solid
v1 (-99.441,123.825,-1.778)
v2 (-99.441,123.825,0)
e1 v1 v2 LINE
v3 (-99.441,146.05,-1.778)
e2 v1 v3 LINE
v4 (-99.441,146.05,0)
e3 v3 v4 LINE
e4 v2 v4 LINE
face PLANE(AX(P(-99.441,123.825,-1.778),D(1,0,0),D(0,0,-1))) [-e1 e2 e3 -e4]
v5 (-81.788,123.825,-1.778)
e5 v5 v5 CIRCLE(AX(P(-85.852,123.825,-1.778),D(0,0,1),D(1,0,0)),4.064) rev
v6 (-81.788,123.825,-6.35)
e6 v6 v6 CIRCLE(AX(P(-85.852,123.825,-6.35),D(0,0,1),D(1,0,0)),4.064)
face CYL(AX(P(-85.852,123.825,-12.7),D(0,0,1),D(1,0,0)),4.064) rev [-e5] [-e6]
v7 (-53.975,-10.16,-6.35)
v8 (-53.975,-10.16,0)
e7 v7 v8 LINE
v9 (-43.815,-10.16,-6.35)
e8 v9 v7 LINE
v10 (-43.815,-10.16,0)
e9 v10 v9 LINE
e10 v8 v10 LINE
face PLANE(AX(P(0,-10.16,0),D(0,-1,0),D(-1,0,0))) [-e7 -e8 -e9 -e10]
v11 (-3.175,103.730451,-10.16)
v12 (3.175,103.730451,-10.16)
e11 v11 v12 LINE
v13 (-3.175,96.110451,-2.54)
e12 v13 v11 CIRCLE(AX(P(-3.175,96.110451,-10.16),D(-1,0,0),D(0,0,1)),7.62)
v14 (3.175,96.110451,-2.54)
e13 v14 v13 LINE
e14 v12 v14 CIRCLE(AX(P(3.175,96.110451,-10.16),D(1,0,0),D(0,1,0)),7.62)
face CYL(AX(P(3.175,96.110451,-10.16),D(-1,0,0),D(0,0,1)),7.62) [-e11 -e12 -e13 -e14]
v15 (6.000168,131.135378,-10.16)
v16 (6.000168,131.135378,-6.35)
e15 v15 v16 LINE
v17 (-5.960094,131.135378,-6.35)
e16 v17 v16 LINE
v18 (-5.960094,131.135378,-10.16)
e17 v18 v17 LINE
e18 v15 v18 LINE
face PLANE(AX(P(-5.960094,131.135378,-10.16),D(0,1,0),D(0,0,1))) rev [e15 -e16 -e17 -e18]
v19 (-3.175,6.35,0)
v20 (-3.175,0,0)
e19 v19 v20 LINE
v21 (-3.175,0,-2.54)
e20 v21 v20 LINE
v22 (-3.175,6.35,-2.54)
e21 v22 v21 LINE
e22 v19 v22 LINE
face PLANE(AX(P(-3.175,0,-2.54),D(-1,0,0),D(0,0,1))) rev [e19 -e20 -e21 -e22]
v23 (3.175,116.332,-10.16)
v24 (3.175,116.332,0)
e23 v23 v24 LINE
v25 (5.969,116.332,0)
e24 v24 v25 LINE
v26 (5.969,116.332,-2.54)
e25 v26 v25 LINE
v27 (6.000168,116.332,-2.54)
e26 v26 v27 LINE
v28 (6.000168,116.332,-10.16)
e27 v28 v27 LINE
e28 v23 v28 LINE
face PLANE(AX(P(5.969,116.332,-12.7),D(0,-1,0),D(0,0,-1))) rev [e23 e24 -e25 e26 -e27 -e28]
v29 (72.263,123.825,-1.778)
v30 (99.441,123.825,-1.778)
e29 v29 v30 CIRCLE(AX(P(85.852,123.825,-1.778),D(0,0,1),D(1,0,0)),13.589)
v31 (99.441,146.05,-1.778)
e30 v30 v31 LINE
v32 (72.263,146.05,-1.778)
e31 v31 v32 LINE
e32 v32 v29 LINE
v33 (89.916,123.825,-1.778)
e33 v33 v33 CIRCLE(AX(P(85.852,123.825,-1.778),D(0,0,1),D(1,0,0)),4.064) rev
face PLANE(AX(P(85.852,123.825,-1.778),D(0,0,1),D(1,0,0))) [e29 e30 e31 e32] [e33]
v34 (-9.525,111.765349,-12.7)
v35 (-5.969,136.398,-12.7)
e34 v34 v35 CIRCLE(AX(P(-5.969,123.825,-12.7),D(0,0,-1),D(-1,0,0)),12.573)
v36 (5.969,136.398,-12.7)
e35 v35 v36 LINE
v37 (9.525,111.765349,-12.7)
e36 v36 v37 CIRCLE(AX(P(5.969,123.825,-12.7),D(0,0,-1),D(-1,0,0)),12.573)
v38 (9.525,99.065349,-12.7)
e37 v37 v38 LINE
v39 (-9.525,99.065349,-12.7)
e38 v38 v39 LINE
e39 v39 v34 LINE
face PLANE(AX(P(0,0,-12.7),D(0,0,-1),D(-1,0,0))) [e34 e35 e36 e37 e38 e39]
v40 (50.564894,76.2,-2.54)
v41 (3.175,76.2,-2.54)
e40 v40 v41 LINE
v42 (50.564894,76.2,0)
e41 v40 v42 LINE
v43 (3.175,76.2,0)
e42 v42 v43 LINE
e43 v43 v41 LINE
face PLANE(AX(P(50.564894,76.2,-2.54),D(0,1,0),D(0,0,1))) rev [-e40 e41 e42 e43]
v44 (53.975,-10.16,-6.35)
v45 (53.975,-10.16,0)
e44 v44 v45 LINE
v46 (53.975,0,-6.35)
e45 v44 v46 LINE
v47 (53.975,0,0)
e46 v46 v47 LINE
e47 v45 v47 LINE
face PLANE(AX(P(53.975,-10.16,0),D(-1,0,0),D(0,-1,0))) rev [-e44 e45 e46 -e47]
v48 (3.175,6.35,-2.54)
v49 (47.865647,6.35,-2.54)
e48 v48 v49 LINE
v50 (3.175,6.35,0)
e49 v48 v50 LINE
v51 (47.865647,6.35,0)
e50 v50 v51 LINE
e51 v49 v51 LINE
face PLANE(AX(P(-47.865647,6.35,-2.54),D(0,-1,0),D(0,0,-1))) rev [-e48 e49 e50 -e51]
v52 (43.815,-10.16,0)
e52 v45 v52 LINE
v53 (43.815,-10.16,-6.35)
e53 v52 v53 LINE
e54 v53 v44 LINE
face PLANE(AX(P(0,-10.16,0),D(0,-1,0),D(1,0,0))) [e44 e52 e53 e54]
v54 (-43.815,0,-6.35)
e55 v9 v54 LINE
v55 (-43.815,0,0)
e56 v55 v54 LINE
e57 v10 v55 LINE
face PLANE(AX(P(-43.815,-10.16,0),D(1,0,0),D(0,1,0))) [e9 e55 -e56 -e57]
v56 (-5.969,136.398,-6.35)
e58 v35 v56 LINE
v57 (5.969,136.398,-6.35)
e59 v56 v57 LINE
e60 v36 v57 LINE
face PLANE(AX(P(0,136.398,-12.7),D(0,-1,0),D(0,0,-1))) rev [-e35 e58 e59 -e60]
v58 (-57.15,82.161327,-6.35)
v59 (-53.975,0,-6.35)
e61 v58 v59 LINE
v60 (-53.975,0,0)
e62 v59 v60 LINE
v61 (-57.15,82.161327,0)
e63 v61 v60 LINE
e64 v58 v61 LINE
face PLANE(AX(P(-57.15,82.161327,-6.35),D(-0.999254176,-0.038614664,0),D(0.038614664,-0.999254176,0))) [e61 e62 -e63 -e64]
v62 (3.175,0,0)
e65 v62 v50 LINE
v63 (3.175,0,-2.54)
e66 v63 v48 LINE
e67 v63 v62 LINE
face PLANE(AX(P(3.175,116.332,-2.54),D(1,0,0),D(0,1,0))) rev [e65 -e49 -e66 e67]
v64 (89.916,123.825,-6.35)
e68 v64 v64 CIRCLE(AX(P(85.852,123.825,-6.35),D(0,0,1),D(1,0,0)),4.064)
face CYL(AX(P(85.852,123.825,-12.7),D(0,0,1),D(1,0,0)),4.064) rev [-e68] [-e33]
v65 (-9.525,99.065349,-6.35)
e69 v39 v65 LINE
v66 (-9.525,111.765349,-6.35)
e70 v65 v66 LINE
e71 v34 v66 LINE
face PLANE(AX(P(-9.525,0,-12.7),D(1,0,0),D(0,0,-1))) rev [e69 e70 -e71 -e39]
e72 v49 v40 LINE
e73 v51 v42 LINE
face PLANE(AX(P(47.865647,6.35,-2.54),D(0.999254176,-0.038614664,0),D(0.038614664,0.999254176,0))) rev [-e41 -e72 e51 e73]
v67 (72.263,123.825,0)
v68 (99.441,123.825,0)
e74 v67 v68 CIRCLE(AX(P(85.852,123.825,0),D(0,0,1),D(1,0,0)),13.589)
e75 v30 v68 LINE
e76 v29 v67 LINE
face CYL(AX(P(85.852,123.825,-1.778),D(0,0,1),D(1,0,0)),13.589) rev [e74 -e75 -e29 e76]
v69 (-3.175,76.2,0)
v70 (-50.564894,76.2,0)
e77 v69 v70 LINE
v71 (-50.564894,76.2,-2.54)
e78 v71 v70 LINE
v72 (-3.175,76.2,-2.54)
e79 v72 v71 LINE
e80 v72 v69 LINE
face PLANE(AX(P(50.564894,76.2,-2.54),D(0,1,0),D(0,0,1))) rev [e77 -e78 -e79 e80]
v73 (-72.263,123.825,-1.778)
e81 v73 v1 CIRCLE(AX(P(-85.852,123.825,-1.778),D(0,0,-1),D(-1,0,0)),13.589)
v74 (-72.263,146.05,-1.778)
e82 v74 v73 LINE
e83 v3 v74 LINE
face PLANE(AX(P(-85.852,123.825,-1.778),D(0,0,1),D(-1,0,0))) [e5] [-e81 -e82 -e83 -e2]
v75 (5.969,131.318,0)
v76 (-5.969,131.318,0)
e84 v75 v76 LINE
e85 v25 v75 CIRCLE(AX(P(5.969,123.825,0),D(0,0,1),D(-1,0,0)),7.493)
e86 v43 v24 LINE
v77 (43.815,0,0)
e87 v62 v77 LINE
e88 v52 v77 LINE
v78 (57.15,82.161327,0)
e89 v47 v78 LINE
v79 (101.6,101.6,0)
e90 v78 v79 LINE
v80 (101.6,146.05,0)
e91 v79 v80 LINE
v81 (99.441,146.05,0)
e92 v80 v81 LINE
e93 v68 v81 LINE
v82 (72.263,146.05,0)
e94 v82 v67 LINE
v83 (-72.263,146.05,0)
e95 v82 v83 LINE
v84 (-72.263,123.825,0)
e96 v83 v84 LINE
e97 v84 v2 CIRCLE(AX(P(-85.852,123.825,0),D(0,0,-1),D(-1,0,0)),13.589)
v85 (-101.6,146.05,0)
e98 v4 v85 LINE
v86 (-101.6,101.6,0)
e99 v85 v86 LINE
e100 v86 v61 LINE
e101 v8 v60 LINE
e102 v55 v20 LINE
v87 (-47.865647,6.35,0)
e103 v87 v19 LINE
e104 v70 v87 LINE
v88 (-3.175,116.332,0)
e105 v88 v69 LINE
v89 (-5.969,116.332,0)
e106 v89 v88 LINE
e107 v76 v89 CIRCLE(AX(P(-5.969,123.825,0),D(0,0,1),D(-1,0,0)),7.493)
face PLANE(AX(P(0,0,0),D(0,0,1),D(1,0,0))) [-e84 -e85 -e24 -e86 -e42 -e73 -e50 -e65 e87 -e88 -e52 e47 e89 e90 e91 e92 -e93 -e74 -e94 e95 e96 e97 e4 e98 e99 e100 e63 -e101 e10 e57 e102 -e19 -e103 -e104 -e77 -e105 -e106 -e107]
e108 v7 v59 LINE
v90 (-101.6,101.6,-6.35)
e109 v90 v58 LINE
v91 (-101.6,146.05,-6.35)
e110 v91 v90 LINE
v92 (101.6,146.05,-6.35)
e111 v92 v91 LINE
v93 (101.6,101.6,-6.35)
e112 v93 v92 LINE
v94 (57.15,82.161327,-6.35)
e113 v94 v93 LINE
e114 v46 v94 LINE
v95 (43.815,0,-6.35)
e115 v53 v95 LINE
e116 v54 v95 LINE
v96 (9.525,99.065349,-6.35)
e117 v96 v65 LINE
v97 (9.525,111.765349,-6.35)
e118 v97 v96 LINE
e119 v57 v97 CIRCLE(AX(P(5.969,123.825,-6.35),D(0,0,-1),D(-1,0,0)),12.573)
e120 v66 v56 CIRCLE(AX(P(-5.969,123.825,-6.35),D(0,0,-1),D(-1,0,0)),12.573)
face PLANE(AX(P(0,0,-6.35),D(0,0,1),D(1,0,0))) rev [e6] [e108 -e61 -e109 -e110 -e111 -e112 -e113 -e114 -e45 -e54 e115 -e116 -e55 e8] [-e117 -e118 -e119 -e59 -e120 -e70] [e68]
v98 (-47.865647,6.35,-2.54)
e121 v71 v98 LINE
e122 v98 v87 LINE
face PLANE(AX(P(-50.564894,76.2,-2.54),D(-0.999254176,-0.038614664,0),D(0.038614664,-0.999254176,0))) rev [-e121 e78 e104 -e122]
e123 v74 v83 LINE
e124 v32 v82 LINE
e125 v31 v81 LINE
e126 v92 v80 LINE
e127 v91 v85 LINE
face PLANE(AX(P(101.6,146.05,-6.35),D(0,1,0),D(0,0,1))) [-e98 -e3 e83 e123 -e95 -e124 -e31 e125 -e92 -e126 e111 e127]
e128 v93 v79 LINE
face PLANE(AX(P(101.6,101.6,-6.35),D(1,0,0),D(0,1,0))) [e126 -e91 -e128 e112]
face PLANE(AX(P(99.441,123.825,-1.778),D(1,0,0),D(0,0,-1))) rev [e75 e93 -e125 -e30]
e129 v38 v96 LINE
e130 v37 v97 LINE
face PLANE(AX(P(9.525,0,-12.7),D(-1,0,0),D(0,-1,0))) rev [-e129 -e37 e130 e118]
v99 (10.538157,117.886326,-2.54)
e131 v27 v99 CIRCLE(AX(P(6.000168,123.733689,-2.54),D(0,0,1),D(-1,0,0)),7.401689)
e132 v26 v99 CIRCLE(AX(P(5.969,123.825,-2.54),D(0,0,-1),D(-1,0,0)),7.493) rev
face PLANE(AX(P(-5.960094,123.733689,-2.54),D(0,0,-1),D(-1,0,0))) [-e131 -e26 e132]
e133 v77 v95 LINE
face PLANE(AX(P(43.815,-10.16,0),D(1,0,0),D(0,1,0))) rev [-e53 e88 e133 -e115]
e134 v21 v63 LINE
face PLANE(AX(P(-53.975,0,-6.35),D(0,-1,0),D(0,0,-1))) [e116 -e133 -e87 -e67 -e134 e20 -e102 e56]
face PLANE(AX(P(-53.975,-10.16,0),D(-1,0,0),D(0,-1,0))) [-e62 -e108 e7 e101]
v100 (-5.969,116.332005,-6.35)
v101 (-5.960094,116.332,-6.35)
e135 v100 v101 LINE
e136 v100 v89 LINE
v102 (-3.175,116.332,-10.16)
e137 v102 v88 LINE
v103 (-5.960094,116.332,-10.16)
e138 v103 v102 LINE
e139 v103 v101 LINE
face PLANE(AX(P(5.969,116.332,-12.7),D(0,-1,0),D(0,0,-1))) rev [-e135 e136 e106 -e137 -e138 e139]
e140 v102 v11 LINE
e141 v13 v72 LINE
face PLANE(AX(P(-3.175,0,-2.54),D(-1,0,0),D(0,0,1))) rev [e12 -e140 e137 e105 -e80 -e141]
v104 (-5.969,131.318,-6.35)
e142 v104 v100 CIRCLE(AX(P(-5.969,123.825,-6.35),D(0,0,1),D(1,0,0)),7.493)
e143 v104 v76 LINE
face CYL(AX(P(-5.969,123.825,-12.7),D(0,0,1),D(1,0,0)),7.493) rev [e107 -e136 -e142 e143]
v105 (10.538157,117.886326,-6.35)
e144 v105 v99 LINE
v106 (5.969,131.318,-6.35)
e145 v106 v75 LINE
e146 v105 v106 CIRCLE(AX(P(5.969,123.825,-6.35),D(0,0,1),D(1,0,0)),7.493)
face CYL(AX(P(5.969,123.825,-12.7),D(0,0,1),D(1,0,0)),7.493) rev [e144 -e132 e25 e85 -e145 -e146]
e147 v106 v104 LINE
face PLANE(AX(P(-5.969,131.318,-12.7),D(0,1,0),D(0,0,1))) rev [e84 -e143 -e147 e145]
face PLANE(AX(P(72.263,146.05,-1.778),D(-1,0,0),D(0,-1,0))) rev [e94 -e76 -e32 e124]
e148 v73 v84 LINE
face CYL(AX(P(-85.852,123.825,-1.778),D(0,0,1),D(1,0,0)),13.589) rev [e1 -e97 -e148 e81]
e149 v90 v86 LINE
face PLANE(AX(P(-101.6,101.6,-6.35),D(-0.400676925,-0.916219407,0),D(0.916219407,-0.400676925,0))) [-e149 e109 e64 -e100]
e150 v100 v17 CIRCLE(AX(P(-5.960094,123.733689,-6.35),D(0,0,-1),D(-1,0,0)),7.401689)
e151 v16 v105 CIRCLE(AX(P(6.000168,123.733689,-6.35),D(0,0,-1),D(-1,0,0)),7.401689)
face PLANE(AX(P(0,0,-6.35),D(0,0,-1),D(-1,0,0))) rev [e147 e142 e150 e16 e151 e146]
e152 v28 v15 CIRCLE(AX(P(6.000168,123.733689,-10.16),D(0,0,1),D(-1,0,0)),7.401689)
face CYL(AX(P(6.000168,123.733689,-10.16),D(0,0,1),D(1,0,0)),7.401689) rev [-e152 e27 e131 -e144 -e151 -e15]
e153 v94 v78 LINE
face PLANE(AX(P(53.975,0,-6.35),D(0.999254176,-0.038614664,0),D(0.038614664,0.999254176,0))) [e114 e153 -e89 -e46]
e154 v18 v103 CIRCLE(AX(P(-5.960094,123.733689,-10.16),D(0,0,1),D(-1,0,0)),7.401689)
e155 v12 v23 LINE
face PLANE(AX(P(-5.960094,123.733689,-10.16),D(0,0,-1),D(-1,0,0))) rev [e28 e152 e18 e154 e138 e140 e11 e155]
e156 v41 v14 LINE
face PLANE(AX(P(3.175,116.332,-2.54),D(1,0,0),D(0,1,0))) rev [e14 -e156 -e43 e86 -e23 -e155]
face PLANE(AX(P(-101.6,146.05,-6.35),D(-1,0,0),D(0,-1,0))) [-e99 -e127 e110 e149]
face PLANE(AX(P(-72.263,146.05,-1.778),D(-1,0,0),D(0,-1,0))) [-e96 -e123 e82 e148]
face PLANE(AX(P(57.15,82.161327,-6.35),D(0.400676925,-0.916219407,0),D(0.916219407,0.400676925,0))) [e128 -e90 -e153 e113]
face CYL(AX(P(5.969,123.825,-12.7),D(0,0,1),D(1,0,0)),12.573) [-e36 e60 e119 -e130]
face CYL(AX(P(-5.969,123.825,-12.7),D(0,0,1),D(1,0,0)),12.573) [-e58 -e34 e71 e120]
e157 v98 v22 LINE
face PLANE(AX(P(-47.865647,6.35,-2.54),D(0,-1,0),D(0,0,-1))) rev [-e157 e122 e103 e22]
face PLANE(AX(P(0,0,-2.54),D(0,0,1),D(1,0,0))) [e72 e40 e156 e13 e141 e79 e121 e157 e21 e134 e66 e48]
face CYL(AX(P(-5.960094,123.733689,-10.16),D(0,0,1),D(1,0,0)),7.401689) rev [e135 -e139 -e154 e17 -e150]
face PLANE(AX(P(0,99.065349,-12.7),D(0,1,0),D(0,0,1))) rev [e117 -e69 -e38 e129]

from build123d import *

# Parameters (mm, degrees)
MAIN_BODY_DEPTH          = 6.35
BATTERY_SPACING_DEPTH    = 2.54
SKETCH8_R                = 4.064
LIGHT_SOCKETS_DEPTH      = 12.7
LIGHT_LEADS_POCKET_DEPTH = 6.35
WIRE_TRAIL_DEPTH         = 2.54
LEAD_ROOM_DEPTH          = 7.62
FILLET1_R                = 7.62
TAB_SLOTS_DEPTH          = 1.778
SKETCH14_W               = 10.16
SKETCH14_H               = 6.35
SCREW_MOUNT_DEPTH        = 10.16


# Sheet-metal steps are written as plain solids
with BuildPart() as part:
    # Sketch1 → Main Body (new body)
    with BuildSketch(Plane.XY):
        Polygon((-53.975, 0), (53.975, 0), (57.15, 82.161327118), (101.6, 101.6), (101.6, 146.05), (-101.6, 146.05), (-101.6, 101.6), (-57.15, 82.161327118), align=None)
    extrude(amount=-MAIN_BODY_DEPTH)

    # Sketch7 → Battery Spacing (cut)
    with BuildSketch(Plane.XY):
        Polygon((-50.564894027, 76.2), (-47.86564661, 6.35), (47.86564661, 6.35), (50.564894027, 76.2), align=None)
    extrude(amount=-BATTERY_SPACING_DEPTH, mode=Mode.SUBTRACT)

    # Sketch8 → Light Sockets (cut)
    with BuildSketch(Plane.XY):
        with Locations((85.852, 123.825)):
            Circle(SKETCH8_R)
        with Locations((-85.852, 123.825)):
            Circle(SKETCH8_R)
        with BuildLine():
            Line((-5.969, 131.318), (5.969, 131.318))
            ThreePointArc((5.969, 131.318), (13.462, 123.825), (5.969, 116.332))
            Line((5.969, 116.332), (-5.969, 116.332))
            ThreePointArc((-5.969, 116.332), (-13.462, 123.825), (-5.969, 131.318))
        make_face()
    extrude(amount=-LIGHT_SOCKETS_DEPTH, mode=Mode.SUBTRACT)

    # Sketch9 → Light Leads Pocket (add)
    with BuildSketch(Plane(origin=(0, 0, -6.35), x_dir=(-1, 0, 0), z_dir=(0, 0, -1))):
        with BuildLine():
            Line((-9.525, 111.765348554), (-9.525, 99.065348554))
            Line((-9.525, 99.065348554), (9.525, 99.065348554))
            Line((9.525, 99.065348554), (9.525, 111.765348554))
            ThreePointArc((9.525, 111.765348554), (18.413001098, 125.621431375), (5.969, 136.398))
            Line((5.969, 136.398), (-5.969, 136.398))
            ThreePointArc((-5.969, 136.398), (-18.413001098, 125.621431375), (-9.525, 111.765348554))
        make_face()
    extrude(amount=LIGHT_LEADS_POCKET_DEPTH)

    # Sketch10 → Wire Trail (cut)
    with BuildSketch(Plane.XY):
        Polygon((-3.175, 116.332), (3.175, 116.332), (3.175, 76.2), (3.175, 6.35), (3.175, 0), (-3.175, 0), align=None)
    extrude(amount=-WIRE_TRAIL_DEPTH, mode=Mode.SUBTRACT)

    # Sketch12 → Lead Room (cut)
    with BuildSketch(Plane.XY.offset(-2.54)):
        with BuildLine():
            Line((-3.175, 116.332), (-5.960094489, 116.332))
            ThreePointArc((-5.960094489, 116.332), (-13.36178344, 123.73368895), (-5.960094489, 131.135377901))
            Line((-5.960094489, 131.135377901), (6.000168296, 131.135377901))
            ThreePointArc((6.000168296, 131.135377901), (13.401857247, 123.73368895), (6.000168296, 116.332))
            Line((6.000168296, 116.332), (3.175, 116.332))
            Line((3.175, 116.332), (3.175, 103.730451358))
            Line((3.175, 103.730451358), (-3.175, 103.730451358))
            Line((-3.175, 103.730451358), (-3.175, 116.332))
        make_face()
    extrude(amount=-LEAD_ROOM_DEPTH, mode=Mode.SUBTRACT)

    # Fillet1
    fillet1_edges = [part.edges().sort_by_distance(p)[0] for p in [
        (0, 103.730451358, -2.54),
    ]]
    fillet(fillet1_edges, radius=FILLET1_R - 0.0001)  # a hair under: the kernel refuses the full size

    # Sketch13 → Tab Slots (cut)
    with BuildSketch(Plane.XY):
        with BuildLine():
            Line((72.263, 146.05), (72.263, 123.825))
            ThreePointArc((72.263, 123.825), (85.852, 110.236), (99.441, 123.825))
            Line((99.441, 123.825), (99.441, 146.05))
            Line((99.441, 146.05), (72.263, 146.05))
        make_face()
    tab_slots = extrude(amount=-TAB_SLOTS_DEPTH, mode=Mode.SUBTRACT)

    # Mirror1: Tab Slots across plane
    add(tab_slots.mirror(Plane(origin=(0, 0, 0), x_dir=(0, 0, 1), z_dir=(1, 0, 0))), mode=Mode.SUBTRACT)

    # Sketch14 → Screw Mount (add)
    with BuildSketch(Plane.XZ):
        with Locations((48.895, -3.175)):
            Rectangle(SKETCH14_W, SKETCH14_H)
    screw_mount = extrude(amount=SCREW_MOUNT_DEPTH)

    # Mirror2: Screw Mount across plane
    add(screw_mount.mirror(Plane(origin=(0, 0, 0), x_dir=(0, 0, 1), z_dir=(1, 0, 0))))


solid = part.part
